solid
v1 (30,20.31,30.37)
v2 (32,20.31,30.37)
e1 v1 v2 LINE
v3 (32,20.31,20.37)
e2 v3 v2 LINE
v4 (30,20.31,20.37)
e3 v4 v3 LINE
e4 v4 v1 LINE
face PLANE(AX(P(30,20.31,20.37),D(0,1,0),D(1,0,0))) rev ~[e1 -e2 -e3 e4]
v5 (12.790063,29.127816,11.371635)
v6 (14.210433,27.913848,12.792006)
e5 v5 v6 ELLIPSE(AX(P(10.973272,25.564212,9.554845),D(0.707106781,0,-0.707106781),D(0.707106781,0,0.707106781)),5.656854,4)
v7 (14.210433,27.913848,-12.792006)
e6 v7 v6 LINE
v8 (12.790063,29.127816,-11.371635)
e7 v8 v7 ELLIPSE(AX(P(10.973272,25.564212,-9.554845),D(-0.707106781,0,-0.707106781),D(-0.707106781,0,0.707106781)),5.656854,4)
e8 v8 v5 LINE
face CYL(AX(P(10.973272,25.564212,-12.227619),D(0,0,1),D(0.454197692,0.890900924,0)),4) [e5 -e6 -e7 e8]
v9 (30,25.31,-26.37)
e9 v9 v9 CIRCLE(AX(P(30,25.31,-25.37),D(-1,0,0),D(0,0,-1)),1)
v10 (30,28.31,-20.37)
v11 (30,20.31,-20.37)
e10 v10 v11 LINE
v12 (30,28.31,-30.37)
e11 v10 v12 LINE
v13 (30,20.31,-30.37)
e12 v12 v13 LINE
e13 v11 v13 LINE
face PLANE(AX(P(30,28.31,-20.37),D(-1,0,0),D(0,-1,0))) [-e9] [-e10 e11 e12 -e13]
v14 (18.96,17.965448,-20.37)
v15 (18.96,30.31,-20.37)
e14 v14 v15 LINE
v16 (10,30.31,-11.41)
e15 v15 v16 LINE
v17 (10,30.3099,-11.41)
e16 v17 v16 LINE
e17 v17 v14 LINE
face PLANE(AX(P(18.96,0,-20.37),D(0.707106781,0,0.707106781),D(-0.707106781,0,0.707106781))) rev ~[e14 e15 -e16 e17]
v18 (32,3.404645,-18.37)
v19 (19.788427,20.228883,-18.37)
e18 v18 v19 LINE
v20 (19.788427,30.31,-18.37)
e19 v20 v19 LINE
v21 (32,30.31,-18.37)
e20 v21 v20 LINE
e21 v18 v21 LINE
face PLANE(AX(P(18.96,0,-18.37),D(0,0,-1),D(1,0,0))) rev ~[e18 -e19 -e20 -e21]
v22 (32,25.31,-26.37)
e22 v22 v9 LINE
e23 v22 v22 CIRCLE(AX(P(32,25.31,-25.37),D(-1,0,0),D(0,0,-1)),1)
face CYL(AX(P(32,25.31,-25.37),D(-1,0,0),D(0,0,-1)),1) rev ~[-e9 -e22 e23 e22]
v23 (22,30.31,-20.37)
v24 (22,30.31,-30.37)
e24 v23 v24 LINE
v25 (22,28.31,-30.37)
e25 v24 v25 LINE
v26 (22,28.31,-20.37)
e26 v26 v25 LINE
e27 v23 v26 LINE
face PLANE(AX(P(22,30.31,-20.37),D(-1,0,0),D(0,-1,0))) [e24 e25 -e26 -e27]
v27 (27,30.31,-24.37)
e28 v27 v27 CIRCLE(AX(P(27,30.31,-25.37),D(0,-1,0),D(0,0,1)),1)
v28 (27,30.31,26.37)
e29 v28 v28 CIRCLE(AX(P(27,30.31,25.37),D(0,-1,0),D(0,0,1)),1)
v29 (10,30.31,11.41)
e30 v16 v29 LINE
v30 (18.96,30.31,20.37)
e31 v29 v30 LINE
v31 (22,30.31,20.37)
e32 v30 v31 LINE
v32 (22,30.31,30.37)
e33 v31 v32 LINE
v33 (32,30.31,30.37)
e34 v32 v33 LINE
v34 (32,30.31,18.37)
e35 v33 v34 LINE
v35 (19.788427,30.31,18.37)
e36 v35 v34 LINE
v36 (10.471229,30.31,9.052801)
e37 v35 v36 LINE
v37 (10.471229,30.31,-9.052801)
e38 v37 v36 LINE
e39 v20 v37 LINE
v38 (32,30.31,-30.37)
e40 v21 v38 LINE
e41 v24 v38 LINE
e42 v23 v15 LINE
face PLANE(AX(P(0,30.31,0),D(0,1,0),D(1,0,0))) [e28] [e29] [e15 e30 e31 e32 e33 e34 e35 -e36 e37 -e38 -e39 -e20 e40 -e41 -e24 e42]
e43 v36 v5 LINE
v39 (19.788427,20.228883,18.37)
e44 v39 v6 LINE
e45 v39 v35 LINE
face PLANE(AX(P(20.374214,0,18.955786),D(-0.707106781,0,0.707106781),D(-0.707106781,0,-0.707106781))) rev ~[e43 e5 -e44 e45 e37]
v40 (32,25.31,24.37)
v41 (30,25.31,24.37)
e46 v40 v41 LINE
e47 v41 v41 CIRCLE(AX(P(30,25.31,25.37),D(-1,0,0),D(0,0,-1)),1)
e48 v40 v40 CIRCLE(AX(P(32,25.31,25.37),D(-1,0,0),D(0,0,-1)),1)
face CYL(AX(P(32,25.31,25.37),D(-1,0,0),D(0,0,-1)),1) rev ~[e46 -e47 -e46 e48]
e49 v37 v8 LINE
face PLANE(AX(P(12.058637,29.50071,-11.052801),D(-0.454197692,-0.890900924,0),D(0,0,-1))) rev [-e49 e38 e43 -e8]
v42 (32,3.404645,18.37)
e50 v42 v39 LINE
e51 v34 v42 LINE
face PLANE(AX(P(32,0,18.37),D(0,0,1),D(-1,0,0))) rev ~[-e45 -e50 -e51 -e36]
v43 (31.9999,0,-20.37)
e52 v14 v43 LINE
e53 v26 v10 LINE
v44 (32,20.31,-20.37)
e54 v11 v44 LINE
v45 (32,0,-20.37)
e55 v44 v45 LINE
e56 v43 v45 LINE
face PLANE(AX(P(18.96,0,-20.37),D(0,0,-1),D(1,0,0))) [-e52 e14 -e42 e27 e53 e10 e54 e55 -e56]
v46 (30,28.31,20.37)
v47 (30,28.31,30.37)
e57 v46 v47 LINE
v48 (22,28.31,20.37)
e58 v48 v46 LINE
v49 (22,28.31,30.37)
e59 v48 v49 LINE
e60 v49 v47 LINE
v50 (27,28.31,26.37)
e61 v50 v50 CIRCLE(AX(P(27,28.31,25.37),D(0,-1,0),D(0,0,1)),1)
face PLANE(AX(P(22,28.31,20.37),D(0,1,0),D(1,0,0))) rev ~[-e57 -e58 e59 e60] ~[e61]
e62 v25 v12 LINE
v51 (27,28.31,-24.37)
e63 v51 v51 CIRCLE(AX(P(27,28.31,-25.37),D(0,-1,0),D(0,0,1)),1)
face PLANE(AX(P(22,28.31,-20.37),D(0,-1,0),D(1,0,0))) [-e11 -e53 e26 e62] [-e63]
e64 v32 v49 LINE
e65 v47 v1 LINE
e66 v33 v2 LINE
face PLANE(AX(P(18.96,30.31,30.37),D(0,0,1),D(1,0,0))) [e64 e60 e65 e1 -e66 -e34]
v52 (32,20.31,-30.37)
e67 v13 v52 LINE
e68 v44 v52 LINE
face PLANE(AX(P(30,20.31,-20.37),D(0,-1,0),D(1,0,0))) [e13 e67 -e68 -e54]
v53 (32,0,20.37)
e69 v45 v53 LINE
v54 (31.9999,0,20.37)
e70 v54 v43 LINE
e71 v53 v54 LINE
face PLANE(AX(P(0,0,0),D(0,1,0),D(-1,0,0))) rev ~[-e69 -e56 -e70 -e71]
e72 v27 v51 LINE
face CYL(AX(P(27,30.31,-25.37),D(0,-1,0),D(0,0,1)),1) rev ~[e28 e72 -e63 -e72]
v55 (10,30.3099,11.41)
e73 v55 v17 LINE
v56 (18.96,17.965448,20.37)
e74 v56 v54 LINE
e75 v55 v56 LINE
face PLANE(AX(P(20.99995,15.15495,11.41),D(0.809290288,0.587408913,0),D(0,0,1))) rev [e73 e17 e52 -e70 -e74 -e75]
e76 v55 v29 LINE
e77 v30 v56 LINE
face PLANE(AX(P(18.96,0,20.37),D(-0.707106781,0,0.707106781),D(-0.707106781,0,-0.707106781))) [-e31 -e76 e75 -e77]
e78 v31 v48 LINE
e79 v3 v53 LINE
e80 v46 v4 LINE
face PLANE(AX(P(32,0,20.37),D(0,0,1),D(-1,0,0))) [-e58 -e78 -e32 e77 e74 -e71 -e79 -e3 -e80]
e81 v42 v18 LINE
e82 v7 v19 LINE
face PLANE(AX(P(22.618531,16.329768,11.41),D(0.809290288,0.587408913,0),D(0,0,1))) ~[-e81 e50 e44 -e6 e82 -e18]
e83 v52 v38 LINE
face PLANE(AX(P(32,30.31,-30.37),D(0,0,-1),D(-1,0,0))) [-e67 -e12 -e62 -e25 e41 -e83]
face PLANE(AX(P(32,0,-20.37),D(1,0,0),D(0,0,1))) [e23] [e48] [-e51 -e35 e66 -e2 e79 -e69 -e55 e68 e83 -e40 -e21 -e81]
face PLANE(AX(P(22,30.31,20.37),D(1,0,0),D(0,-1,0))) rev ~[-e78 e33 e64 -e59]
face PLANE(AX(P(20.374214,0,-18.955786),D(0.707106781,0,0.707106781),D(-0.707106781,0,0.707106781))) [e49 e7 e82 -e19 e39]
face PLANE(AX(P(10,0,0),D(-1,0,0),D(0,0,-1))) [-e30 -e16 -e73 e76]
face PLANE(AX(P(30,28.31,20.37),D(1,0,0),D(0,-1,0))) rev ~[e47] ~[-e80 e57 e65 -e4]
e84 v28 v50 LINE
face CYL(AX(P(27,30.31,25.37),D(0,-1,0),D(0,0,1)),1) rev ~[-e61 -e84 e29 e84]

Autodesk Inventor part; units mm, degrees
ref_plane "YZ Plane" through (0, 0, 0) normal (1, 0, 0) x (0, 1, 0)
ref_plane "XZ Plane" through (0, 0, 0) normal (0, 1, 0) x (-1, 0, 0)
ref_plane "XY Plane" through (0, 0, 0) normal (0, 0, 1) x (1, 0, 0)
sketch "Boceto1" plane through (0, 0, 0) normal (0, 1, 0) x (-1, 0, 0)
  line L0 (-18.96, -20.37) -> (-32, -20.37)
  line L1 (-32, -20.37) -> (-32, 20.37)
  line L2 (-32, 20.37) -> (-18.96, 20.37)
  line L3 (-18.96, 20.37) -> (-10, 11.41)
  line L4 (-18.96, -20.37) -> (-10, -11.41)
  line L5 (-10, 0) -> (-10, 14.0554)
  line L6 (-10, 0) -> (4.0554, 0) construction
  line L7 (-10, 14.0554) -> (-10, -14.0554)
  dimension "d15" = 13.04
  dimension "d16" = 40.74
  dimension "d17" = 13.04
  dimension "d108" = 90
extrude "Extrusión1" add sketch "Boceto1" along normal blind 20.31
sketch "Boceto7" plane through (0, 20.31, 0) normal (0, 1, 0) x (1, 0, 0)
  line L0 (6.8202, -5.4018) -> (6.8202, 5.4018) projected
  line L1 (32, -20.37) -> (32, 20.37) projected
  line L2 (32, 20.37) -> (18.96, 20.37) projected
  line L3 (18.96, 20.37) -> (10, 11.41) projected
  line L4 (10, -11.41) -> (18.96, -20.37) projected
  line L5 (18.96, -20.37) -> (32, -20.37) projected
  line L6 (10, 11.41) -> (10, -11.41) projected
  point P0 (0, 0)
extrude "Extrusión5" add sketch "Boceto7" along normal blind 10
chamfer "Chaflán2" distance 30.31 distance2 22 1 edges at (10, 0, 0) measured on face at (10, 10.1033, -3.8033)
shell "Vaciado2" thickness 2 removed faces 3 at (24.6667, 30.31, 3.8033) at (32, 0, 6.79) at (32, 10.1033, 6.79)
chamfer "Chaflán3" distance 2 angle 45 1 edges at (12.4712, 30.31, 0)
fillet "Empalme2" radius 4 1 edges at (13.646, 28.6914, 0)
sketch "Boceto13" plane through (18.96, 30.31, 20.37) normal (0, 0, 1) x (1, 0, 0)
  line L0 (13.04, 0) -> (3.04, 0)
  line L1 (3.04, 0) -> (3.04, -2)
  line L2 (3.04, -2) -> (13.04, -2)
  line L3 (13.04, -2) -> (13.04, 0)
  line L4 (13.04, 0) -> (11.04, 0)
  line L5 (11.04, 0) -> (11.04, -10)
  line L6 (11.04, -10) -> (13.04, -10)
  line L7 (13.04, -10) -> (13.04, 0)
  point P0 (-18.96, -30.31)
  point P1 (11.04, -2)
  point P2 (13.04, -2)
  dimension "d123" = 10
  dimension "d124" = 2
  dimension "d125" = 2
  dimension "d126" = 10
extrude "Extrusión9" add sketch "Boceto13" along normal blind 10
sketch "Boceto14" plane through (32, 30.31, -20.37) normal (0, 0, -1) x (-1, 0, 0)
  line L0 (0, -26.9052) -> (0, 0) projected
  line L1 (0, 0) -> (10, 0)
  line L2 (10, 0) -> (10, -2)
  line L3 (10, -2) -> (0, -2)
  line L4 (0, -2) -> (0, 0)
  line L5 (0, 0) -> (12.2116, 0) projected
  line L6 (0, 0) -> (2, 0)
  line L7 (2, 0) -> (2, -10)
  line L8 (2, -10) -> (0, -10)
  line L9 (0, -10) -> (0, 0)
  point P0 (32, -30.31)
  point P1 (2, -2)
  dimension "d129" = 10
  dimension "d130" = 2
  dimension "d131" = 2
  dimension "d132" = 10
extrude "Extrusión10" add sketch "Boceto14" along normal blind 10
sketch "Boceto15" plane through (32, 0, 20.37) normal (1, 0, 0) x (0, 0, -1)
  line L0 (2, 30.31) -> (-10, 30.31) projected
  line L1 (-10, 20.31) -> (-10, 30.31) projected
  line L2 (38.74, 30.31) -> (50.74, 30.31) projected
  line L3 (50.74, 30.31) -> (50.74, 20.31) projected
  point P0 (20.37, 0)
  point P1 (-5, 25.31)
  point P2 (45.74, 25.31)
  dimension "d135" = 5
  dimension "d136" = 5
  dimension "d144" = 5
  dimension "d145" = 5
hole "Agujero5" at (32, 25.31, 25.37) at (32, 25.31, -25.37) direction (-1, 0, 0) diameter 2 depth 2.5 tip angle 118
sketch "Boceto16" plane through (0, 30.31, 0) normal (0, 1, 0) x (1, 0, 0)
  line L0 (32, -30.37) -> (22, -30.37) projected
  line L1 (22, -20.37) -> (22, -30.37) projected
  line L2 (22, 30.37) -> (32, 30.37) projected
  line L3 (22, 20.37) -> (22, 30.37) projected
  point P0 (0, 0)
  point P1 (27, -25.37)
  point P2 (27, 25.37)
  dimension "d146" = 5
  dimension "d147" = 5
  dimension "d148" = 5
  dimension "d149" = 5
hole "Agujero6" at (27, 30.31, 25.37) at (27, 30.31, -25.37) direction (0, -1, 0) diameter 2 depth 2.5 tip angle 118
properties part number "Rampa2"
